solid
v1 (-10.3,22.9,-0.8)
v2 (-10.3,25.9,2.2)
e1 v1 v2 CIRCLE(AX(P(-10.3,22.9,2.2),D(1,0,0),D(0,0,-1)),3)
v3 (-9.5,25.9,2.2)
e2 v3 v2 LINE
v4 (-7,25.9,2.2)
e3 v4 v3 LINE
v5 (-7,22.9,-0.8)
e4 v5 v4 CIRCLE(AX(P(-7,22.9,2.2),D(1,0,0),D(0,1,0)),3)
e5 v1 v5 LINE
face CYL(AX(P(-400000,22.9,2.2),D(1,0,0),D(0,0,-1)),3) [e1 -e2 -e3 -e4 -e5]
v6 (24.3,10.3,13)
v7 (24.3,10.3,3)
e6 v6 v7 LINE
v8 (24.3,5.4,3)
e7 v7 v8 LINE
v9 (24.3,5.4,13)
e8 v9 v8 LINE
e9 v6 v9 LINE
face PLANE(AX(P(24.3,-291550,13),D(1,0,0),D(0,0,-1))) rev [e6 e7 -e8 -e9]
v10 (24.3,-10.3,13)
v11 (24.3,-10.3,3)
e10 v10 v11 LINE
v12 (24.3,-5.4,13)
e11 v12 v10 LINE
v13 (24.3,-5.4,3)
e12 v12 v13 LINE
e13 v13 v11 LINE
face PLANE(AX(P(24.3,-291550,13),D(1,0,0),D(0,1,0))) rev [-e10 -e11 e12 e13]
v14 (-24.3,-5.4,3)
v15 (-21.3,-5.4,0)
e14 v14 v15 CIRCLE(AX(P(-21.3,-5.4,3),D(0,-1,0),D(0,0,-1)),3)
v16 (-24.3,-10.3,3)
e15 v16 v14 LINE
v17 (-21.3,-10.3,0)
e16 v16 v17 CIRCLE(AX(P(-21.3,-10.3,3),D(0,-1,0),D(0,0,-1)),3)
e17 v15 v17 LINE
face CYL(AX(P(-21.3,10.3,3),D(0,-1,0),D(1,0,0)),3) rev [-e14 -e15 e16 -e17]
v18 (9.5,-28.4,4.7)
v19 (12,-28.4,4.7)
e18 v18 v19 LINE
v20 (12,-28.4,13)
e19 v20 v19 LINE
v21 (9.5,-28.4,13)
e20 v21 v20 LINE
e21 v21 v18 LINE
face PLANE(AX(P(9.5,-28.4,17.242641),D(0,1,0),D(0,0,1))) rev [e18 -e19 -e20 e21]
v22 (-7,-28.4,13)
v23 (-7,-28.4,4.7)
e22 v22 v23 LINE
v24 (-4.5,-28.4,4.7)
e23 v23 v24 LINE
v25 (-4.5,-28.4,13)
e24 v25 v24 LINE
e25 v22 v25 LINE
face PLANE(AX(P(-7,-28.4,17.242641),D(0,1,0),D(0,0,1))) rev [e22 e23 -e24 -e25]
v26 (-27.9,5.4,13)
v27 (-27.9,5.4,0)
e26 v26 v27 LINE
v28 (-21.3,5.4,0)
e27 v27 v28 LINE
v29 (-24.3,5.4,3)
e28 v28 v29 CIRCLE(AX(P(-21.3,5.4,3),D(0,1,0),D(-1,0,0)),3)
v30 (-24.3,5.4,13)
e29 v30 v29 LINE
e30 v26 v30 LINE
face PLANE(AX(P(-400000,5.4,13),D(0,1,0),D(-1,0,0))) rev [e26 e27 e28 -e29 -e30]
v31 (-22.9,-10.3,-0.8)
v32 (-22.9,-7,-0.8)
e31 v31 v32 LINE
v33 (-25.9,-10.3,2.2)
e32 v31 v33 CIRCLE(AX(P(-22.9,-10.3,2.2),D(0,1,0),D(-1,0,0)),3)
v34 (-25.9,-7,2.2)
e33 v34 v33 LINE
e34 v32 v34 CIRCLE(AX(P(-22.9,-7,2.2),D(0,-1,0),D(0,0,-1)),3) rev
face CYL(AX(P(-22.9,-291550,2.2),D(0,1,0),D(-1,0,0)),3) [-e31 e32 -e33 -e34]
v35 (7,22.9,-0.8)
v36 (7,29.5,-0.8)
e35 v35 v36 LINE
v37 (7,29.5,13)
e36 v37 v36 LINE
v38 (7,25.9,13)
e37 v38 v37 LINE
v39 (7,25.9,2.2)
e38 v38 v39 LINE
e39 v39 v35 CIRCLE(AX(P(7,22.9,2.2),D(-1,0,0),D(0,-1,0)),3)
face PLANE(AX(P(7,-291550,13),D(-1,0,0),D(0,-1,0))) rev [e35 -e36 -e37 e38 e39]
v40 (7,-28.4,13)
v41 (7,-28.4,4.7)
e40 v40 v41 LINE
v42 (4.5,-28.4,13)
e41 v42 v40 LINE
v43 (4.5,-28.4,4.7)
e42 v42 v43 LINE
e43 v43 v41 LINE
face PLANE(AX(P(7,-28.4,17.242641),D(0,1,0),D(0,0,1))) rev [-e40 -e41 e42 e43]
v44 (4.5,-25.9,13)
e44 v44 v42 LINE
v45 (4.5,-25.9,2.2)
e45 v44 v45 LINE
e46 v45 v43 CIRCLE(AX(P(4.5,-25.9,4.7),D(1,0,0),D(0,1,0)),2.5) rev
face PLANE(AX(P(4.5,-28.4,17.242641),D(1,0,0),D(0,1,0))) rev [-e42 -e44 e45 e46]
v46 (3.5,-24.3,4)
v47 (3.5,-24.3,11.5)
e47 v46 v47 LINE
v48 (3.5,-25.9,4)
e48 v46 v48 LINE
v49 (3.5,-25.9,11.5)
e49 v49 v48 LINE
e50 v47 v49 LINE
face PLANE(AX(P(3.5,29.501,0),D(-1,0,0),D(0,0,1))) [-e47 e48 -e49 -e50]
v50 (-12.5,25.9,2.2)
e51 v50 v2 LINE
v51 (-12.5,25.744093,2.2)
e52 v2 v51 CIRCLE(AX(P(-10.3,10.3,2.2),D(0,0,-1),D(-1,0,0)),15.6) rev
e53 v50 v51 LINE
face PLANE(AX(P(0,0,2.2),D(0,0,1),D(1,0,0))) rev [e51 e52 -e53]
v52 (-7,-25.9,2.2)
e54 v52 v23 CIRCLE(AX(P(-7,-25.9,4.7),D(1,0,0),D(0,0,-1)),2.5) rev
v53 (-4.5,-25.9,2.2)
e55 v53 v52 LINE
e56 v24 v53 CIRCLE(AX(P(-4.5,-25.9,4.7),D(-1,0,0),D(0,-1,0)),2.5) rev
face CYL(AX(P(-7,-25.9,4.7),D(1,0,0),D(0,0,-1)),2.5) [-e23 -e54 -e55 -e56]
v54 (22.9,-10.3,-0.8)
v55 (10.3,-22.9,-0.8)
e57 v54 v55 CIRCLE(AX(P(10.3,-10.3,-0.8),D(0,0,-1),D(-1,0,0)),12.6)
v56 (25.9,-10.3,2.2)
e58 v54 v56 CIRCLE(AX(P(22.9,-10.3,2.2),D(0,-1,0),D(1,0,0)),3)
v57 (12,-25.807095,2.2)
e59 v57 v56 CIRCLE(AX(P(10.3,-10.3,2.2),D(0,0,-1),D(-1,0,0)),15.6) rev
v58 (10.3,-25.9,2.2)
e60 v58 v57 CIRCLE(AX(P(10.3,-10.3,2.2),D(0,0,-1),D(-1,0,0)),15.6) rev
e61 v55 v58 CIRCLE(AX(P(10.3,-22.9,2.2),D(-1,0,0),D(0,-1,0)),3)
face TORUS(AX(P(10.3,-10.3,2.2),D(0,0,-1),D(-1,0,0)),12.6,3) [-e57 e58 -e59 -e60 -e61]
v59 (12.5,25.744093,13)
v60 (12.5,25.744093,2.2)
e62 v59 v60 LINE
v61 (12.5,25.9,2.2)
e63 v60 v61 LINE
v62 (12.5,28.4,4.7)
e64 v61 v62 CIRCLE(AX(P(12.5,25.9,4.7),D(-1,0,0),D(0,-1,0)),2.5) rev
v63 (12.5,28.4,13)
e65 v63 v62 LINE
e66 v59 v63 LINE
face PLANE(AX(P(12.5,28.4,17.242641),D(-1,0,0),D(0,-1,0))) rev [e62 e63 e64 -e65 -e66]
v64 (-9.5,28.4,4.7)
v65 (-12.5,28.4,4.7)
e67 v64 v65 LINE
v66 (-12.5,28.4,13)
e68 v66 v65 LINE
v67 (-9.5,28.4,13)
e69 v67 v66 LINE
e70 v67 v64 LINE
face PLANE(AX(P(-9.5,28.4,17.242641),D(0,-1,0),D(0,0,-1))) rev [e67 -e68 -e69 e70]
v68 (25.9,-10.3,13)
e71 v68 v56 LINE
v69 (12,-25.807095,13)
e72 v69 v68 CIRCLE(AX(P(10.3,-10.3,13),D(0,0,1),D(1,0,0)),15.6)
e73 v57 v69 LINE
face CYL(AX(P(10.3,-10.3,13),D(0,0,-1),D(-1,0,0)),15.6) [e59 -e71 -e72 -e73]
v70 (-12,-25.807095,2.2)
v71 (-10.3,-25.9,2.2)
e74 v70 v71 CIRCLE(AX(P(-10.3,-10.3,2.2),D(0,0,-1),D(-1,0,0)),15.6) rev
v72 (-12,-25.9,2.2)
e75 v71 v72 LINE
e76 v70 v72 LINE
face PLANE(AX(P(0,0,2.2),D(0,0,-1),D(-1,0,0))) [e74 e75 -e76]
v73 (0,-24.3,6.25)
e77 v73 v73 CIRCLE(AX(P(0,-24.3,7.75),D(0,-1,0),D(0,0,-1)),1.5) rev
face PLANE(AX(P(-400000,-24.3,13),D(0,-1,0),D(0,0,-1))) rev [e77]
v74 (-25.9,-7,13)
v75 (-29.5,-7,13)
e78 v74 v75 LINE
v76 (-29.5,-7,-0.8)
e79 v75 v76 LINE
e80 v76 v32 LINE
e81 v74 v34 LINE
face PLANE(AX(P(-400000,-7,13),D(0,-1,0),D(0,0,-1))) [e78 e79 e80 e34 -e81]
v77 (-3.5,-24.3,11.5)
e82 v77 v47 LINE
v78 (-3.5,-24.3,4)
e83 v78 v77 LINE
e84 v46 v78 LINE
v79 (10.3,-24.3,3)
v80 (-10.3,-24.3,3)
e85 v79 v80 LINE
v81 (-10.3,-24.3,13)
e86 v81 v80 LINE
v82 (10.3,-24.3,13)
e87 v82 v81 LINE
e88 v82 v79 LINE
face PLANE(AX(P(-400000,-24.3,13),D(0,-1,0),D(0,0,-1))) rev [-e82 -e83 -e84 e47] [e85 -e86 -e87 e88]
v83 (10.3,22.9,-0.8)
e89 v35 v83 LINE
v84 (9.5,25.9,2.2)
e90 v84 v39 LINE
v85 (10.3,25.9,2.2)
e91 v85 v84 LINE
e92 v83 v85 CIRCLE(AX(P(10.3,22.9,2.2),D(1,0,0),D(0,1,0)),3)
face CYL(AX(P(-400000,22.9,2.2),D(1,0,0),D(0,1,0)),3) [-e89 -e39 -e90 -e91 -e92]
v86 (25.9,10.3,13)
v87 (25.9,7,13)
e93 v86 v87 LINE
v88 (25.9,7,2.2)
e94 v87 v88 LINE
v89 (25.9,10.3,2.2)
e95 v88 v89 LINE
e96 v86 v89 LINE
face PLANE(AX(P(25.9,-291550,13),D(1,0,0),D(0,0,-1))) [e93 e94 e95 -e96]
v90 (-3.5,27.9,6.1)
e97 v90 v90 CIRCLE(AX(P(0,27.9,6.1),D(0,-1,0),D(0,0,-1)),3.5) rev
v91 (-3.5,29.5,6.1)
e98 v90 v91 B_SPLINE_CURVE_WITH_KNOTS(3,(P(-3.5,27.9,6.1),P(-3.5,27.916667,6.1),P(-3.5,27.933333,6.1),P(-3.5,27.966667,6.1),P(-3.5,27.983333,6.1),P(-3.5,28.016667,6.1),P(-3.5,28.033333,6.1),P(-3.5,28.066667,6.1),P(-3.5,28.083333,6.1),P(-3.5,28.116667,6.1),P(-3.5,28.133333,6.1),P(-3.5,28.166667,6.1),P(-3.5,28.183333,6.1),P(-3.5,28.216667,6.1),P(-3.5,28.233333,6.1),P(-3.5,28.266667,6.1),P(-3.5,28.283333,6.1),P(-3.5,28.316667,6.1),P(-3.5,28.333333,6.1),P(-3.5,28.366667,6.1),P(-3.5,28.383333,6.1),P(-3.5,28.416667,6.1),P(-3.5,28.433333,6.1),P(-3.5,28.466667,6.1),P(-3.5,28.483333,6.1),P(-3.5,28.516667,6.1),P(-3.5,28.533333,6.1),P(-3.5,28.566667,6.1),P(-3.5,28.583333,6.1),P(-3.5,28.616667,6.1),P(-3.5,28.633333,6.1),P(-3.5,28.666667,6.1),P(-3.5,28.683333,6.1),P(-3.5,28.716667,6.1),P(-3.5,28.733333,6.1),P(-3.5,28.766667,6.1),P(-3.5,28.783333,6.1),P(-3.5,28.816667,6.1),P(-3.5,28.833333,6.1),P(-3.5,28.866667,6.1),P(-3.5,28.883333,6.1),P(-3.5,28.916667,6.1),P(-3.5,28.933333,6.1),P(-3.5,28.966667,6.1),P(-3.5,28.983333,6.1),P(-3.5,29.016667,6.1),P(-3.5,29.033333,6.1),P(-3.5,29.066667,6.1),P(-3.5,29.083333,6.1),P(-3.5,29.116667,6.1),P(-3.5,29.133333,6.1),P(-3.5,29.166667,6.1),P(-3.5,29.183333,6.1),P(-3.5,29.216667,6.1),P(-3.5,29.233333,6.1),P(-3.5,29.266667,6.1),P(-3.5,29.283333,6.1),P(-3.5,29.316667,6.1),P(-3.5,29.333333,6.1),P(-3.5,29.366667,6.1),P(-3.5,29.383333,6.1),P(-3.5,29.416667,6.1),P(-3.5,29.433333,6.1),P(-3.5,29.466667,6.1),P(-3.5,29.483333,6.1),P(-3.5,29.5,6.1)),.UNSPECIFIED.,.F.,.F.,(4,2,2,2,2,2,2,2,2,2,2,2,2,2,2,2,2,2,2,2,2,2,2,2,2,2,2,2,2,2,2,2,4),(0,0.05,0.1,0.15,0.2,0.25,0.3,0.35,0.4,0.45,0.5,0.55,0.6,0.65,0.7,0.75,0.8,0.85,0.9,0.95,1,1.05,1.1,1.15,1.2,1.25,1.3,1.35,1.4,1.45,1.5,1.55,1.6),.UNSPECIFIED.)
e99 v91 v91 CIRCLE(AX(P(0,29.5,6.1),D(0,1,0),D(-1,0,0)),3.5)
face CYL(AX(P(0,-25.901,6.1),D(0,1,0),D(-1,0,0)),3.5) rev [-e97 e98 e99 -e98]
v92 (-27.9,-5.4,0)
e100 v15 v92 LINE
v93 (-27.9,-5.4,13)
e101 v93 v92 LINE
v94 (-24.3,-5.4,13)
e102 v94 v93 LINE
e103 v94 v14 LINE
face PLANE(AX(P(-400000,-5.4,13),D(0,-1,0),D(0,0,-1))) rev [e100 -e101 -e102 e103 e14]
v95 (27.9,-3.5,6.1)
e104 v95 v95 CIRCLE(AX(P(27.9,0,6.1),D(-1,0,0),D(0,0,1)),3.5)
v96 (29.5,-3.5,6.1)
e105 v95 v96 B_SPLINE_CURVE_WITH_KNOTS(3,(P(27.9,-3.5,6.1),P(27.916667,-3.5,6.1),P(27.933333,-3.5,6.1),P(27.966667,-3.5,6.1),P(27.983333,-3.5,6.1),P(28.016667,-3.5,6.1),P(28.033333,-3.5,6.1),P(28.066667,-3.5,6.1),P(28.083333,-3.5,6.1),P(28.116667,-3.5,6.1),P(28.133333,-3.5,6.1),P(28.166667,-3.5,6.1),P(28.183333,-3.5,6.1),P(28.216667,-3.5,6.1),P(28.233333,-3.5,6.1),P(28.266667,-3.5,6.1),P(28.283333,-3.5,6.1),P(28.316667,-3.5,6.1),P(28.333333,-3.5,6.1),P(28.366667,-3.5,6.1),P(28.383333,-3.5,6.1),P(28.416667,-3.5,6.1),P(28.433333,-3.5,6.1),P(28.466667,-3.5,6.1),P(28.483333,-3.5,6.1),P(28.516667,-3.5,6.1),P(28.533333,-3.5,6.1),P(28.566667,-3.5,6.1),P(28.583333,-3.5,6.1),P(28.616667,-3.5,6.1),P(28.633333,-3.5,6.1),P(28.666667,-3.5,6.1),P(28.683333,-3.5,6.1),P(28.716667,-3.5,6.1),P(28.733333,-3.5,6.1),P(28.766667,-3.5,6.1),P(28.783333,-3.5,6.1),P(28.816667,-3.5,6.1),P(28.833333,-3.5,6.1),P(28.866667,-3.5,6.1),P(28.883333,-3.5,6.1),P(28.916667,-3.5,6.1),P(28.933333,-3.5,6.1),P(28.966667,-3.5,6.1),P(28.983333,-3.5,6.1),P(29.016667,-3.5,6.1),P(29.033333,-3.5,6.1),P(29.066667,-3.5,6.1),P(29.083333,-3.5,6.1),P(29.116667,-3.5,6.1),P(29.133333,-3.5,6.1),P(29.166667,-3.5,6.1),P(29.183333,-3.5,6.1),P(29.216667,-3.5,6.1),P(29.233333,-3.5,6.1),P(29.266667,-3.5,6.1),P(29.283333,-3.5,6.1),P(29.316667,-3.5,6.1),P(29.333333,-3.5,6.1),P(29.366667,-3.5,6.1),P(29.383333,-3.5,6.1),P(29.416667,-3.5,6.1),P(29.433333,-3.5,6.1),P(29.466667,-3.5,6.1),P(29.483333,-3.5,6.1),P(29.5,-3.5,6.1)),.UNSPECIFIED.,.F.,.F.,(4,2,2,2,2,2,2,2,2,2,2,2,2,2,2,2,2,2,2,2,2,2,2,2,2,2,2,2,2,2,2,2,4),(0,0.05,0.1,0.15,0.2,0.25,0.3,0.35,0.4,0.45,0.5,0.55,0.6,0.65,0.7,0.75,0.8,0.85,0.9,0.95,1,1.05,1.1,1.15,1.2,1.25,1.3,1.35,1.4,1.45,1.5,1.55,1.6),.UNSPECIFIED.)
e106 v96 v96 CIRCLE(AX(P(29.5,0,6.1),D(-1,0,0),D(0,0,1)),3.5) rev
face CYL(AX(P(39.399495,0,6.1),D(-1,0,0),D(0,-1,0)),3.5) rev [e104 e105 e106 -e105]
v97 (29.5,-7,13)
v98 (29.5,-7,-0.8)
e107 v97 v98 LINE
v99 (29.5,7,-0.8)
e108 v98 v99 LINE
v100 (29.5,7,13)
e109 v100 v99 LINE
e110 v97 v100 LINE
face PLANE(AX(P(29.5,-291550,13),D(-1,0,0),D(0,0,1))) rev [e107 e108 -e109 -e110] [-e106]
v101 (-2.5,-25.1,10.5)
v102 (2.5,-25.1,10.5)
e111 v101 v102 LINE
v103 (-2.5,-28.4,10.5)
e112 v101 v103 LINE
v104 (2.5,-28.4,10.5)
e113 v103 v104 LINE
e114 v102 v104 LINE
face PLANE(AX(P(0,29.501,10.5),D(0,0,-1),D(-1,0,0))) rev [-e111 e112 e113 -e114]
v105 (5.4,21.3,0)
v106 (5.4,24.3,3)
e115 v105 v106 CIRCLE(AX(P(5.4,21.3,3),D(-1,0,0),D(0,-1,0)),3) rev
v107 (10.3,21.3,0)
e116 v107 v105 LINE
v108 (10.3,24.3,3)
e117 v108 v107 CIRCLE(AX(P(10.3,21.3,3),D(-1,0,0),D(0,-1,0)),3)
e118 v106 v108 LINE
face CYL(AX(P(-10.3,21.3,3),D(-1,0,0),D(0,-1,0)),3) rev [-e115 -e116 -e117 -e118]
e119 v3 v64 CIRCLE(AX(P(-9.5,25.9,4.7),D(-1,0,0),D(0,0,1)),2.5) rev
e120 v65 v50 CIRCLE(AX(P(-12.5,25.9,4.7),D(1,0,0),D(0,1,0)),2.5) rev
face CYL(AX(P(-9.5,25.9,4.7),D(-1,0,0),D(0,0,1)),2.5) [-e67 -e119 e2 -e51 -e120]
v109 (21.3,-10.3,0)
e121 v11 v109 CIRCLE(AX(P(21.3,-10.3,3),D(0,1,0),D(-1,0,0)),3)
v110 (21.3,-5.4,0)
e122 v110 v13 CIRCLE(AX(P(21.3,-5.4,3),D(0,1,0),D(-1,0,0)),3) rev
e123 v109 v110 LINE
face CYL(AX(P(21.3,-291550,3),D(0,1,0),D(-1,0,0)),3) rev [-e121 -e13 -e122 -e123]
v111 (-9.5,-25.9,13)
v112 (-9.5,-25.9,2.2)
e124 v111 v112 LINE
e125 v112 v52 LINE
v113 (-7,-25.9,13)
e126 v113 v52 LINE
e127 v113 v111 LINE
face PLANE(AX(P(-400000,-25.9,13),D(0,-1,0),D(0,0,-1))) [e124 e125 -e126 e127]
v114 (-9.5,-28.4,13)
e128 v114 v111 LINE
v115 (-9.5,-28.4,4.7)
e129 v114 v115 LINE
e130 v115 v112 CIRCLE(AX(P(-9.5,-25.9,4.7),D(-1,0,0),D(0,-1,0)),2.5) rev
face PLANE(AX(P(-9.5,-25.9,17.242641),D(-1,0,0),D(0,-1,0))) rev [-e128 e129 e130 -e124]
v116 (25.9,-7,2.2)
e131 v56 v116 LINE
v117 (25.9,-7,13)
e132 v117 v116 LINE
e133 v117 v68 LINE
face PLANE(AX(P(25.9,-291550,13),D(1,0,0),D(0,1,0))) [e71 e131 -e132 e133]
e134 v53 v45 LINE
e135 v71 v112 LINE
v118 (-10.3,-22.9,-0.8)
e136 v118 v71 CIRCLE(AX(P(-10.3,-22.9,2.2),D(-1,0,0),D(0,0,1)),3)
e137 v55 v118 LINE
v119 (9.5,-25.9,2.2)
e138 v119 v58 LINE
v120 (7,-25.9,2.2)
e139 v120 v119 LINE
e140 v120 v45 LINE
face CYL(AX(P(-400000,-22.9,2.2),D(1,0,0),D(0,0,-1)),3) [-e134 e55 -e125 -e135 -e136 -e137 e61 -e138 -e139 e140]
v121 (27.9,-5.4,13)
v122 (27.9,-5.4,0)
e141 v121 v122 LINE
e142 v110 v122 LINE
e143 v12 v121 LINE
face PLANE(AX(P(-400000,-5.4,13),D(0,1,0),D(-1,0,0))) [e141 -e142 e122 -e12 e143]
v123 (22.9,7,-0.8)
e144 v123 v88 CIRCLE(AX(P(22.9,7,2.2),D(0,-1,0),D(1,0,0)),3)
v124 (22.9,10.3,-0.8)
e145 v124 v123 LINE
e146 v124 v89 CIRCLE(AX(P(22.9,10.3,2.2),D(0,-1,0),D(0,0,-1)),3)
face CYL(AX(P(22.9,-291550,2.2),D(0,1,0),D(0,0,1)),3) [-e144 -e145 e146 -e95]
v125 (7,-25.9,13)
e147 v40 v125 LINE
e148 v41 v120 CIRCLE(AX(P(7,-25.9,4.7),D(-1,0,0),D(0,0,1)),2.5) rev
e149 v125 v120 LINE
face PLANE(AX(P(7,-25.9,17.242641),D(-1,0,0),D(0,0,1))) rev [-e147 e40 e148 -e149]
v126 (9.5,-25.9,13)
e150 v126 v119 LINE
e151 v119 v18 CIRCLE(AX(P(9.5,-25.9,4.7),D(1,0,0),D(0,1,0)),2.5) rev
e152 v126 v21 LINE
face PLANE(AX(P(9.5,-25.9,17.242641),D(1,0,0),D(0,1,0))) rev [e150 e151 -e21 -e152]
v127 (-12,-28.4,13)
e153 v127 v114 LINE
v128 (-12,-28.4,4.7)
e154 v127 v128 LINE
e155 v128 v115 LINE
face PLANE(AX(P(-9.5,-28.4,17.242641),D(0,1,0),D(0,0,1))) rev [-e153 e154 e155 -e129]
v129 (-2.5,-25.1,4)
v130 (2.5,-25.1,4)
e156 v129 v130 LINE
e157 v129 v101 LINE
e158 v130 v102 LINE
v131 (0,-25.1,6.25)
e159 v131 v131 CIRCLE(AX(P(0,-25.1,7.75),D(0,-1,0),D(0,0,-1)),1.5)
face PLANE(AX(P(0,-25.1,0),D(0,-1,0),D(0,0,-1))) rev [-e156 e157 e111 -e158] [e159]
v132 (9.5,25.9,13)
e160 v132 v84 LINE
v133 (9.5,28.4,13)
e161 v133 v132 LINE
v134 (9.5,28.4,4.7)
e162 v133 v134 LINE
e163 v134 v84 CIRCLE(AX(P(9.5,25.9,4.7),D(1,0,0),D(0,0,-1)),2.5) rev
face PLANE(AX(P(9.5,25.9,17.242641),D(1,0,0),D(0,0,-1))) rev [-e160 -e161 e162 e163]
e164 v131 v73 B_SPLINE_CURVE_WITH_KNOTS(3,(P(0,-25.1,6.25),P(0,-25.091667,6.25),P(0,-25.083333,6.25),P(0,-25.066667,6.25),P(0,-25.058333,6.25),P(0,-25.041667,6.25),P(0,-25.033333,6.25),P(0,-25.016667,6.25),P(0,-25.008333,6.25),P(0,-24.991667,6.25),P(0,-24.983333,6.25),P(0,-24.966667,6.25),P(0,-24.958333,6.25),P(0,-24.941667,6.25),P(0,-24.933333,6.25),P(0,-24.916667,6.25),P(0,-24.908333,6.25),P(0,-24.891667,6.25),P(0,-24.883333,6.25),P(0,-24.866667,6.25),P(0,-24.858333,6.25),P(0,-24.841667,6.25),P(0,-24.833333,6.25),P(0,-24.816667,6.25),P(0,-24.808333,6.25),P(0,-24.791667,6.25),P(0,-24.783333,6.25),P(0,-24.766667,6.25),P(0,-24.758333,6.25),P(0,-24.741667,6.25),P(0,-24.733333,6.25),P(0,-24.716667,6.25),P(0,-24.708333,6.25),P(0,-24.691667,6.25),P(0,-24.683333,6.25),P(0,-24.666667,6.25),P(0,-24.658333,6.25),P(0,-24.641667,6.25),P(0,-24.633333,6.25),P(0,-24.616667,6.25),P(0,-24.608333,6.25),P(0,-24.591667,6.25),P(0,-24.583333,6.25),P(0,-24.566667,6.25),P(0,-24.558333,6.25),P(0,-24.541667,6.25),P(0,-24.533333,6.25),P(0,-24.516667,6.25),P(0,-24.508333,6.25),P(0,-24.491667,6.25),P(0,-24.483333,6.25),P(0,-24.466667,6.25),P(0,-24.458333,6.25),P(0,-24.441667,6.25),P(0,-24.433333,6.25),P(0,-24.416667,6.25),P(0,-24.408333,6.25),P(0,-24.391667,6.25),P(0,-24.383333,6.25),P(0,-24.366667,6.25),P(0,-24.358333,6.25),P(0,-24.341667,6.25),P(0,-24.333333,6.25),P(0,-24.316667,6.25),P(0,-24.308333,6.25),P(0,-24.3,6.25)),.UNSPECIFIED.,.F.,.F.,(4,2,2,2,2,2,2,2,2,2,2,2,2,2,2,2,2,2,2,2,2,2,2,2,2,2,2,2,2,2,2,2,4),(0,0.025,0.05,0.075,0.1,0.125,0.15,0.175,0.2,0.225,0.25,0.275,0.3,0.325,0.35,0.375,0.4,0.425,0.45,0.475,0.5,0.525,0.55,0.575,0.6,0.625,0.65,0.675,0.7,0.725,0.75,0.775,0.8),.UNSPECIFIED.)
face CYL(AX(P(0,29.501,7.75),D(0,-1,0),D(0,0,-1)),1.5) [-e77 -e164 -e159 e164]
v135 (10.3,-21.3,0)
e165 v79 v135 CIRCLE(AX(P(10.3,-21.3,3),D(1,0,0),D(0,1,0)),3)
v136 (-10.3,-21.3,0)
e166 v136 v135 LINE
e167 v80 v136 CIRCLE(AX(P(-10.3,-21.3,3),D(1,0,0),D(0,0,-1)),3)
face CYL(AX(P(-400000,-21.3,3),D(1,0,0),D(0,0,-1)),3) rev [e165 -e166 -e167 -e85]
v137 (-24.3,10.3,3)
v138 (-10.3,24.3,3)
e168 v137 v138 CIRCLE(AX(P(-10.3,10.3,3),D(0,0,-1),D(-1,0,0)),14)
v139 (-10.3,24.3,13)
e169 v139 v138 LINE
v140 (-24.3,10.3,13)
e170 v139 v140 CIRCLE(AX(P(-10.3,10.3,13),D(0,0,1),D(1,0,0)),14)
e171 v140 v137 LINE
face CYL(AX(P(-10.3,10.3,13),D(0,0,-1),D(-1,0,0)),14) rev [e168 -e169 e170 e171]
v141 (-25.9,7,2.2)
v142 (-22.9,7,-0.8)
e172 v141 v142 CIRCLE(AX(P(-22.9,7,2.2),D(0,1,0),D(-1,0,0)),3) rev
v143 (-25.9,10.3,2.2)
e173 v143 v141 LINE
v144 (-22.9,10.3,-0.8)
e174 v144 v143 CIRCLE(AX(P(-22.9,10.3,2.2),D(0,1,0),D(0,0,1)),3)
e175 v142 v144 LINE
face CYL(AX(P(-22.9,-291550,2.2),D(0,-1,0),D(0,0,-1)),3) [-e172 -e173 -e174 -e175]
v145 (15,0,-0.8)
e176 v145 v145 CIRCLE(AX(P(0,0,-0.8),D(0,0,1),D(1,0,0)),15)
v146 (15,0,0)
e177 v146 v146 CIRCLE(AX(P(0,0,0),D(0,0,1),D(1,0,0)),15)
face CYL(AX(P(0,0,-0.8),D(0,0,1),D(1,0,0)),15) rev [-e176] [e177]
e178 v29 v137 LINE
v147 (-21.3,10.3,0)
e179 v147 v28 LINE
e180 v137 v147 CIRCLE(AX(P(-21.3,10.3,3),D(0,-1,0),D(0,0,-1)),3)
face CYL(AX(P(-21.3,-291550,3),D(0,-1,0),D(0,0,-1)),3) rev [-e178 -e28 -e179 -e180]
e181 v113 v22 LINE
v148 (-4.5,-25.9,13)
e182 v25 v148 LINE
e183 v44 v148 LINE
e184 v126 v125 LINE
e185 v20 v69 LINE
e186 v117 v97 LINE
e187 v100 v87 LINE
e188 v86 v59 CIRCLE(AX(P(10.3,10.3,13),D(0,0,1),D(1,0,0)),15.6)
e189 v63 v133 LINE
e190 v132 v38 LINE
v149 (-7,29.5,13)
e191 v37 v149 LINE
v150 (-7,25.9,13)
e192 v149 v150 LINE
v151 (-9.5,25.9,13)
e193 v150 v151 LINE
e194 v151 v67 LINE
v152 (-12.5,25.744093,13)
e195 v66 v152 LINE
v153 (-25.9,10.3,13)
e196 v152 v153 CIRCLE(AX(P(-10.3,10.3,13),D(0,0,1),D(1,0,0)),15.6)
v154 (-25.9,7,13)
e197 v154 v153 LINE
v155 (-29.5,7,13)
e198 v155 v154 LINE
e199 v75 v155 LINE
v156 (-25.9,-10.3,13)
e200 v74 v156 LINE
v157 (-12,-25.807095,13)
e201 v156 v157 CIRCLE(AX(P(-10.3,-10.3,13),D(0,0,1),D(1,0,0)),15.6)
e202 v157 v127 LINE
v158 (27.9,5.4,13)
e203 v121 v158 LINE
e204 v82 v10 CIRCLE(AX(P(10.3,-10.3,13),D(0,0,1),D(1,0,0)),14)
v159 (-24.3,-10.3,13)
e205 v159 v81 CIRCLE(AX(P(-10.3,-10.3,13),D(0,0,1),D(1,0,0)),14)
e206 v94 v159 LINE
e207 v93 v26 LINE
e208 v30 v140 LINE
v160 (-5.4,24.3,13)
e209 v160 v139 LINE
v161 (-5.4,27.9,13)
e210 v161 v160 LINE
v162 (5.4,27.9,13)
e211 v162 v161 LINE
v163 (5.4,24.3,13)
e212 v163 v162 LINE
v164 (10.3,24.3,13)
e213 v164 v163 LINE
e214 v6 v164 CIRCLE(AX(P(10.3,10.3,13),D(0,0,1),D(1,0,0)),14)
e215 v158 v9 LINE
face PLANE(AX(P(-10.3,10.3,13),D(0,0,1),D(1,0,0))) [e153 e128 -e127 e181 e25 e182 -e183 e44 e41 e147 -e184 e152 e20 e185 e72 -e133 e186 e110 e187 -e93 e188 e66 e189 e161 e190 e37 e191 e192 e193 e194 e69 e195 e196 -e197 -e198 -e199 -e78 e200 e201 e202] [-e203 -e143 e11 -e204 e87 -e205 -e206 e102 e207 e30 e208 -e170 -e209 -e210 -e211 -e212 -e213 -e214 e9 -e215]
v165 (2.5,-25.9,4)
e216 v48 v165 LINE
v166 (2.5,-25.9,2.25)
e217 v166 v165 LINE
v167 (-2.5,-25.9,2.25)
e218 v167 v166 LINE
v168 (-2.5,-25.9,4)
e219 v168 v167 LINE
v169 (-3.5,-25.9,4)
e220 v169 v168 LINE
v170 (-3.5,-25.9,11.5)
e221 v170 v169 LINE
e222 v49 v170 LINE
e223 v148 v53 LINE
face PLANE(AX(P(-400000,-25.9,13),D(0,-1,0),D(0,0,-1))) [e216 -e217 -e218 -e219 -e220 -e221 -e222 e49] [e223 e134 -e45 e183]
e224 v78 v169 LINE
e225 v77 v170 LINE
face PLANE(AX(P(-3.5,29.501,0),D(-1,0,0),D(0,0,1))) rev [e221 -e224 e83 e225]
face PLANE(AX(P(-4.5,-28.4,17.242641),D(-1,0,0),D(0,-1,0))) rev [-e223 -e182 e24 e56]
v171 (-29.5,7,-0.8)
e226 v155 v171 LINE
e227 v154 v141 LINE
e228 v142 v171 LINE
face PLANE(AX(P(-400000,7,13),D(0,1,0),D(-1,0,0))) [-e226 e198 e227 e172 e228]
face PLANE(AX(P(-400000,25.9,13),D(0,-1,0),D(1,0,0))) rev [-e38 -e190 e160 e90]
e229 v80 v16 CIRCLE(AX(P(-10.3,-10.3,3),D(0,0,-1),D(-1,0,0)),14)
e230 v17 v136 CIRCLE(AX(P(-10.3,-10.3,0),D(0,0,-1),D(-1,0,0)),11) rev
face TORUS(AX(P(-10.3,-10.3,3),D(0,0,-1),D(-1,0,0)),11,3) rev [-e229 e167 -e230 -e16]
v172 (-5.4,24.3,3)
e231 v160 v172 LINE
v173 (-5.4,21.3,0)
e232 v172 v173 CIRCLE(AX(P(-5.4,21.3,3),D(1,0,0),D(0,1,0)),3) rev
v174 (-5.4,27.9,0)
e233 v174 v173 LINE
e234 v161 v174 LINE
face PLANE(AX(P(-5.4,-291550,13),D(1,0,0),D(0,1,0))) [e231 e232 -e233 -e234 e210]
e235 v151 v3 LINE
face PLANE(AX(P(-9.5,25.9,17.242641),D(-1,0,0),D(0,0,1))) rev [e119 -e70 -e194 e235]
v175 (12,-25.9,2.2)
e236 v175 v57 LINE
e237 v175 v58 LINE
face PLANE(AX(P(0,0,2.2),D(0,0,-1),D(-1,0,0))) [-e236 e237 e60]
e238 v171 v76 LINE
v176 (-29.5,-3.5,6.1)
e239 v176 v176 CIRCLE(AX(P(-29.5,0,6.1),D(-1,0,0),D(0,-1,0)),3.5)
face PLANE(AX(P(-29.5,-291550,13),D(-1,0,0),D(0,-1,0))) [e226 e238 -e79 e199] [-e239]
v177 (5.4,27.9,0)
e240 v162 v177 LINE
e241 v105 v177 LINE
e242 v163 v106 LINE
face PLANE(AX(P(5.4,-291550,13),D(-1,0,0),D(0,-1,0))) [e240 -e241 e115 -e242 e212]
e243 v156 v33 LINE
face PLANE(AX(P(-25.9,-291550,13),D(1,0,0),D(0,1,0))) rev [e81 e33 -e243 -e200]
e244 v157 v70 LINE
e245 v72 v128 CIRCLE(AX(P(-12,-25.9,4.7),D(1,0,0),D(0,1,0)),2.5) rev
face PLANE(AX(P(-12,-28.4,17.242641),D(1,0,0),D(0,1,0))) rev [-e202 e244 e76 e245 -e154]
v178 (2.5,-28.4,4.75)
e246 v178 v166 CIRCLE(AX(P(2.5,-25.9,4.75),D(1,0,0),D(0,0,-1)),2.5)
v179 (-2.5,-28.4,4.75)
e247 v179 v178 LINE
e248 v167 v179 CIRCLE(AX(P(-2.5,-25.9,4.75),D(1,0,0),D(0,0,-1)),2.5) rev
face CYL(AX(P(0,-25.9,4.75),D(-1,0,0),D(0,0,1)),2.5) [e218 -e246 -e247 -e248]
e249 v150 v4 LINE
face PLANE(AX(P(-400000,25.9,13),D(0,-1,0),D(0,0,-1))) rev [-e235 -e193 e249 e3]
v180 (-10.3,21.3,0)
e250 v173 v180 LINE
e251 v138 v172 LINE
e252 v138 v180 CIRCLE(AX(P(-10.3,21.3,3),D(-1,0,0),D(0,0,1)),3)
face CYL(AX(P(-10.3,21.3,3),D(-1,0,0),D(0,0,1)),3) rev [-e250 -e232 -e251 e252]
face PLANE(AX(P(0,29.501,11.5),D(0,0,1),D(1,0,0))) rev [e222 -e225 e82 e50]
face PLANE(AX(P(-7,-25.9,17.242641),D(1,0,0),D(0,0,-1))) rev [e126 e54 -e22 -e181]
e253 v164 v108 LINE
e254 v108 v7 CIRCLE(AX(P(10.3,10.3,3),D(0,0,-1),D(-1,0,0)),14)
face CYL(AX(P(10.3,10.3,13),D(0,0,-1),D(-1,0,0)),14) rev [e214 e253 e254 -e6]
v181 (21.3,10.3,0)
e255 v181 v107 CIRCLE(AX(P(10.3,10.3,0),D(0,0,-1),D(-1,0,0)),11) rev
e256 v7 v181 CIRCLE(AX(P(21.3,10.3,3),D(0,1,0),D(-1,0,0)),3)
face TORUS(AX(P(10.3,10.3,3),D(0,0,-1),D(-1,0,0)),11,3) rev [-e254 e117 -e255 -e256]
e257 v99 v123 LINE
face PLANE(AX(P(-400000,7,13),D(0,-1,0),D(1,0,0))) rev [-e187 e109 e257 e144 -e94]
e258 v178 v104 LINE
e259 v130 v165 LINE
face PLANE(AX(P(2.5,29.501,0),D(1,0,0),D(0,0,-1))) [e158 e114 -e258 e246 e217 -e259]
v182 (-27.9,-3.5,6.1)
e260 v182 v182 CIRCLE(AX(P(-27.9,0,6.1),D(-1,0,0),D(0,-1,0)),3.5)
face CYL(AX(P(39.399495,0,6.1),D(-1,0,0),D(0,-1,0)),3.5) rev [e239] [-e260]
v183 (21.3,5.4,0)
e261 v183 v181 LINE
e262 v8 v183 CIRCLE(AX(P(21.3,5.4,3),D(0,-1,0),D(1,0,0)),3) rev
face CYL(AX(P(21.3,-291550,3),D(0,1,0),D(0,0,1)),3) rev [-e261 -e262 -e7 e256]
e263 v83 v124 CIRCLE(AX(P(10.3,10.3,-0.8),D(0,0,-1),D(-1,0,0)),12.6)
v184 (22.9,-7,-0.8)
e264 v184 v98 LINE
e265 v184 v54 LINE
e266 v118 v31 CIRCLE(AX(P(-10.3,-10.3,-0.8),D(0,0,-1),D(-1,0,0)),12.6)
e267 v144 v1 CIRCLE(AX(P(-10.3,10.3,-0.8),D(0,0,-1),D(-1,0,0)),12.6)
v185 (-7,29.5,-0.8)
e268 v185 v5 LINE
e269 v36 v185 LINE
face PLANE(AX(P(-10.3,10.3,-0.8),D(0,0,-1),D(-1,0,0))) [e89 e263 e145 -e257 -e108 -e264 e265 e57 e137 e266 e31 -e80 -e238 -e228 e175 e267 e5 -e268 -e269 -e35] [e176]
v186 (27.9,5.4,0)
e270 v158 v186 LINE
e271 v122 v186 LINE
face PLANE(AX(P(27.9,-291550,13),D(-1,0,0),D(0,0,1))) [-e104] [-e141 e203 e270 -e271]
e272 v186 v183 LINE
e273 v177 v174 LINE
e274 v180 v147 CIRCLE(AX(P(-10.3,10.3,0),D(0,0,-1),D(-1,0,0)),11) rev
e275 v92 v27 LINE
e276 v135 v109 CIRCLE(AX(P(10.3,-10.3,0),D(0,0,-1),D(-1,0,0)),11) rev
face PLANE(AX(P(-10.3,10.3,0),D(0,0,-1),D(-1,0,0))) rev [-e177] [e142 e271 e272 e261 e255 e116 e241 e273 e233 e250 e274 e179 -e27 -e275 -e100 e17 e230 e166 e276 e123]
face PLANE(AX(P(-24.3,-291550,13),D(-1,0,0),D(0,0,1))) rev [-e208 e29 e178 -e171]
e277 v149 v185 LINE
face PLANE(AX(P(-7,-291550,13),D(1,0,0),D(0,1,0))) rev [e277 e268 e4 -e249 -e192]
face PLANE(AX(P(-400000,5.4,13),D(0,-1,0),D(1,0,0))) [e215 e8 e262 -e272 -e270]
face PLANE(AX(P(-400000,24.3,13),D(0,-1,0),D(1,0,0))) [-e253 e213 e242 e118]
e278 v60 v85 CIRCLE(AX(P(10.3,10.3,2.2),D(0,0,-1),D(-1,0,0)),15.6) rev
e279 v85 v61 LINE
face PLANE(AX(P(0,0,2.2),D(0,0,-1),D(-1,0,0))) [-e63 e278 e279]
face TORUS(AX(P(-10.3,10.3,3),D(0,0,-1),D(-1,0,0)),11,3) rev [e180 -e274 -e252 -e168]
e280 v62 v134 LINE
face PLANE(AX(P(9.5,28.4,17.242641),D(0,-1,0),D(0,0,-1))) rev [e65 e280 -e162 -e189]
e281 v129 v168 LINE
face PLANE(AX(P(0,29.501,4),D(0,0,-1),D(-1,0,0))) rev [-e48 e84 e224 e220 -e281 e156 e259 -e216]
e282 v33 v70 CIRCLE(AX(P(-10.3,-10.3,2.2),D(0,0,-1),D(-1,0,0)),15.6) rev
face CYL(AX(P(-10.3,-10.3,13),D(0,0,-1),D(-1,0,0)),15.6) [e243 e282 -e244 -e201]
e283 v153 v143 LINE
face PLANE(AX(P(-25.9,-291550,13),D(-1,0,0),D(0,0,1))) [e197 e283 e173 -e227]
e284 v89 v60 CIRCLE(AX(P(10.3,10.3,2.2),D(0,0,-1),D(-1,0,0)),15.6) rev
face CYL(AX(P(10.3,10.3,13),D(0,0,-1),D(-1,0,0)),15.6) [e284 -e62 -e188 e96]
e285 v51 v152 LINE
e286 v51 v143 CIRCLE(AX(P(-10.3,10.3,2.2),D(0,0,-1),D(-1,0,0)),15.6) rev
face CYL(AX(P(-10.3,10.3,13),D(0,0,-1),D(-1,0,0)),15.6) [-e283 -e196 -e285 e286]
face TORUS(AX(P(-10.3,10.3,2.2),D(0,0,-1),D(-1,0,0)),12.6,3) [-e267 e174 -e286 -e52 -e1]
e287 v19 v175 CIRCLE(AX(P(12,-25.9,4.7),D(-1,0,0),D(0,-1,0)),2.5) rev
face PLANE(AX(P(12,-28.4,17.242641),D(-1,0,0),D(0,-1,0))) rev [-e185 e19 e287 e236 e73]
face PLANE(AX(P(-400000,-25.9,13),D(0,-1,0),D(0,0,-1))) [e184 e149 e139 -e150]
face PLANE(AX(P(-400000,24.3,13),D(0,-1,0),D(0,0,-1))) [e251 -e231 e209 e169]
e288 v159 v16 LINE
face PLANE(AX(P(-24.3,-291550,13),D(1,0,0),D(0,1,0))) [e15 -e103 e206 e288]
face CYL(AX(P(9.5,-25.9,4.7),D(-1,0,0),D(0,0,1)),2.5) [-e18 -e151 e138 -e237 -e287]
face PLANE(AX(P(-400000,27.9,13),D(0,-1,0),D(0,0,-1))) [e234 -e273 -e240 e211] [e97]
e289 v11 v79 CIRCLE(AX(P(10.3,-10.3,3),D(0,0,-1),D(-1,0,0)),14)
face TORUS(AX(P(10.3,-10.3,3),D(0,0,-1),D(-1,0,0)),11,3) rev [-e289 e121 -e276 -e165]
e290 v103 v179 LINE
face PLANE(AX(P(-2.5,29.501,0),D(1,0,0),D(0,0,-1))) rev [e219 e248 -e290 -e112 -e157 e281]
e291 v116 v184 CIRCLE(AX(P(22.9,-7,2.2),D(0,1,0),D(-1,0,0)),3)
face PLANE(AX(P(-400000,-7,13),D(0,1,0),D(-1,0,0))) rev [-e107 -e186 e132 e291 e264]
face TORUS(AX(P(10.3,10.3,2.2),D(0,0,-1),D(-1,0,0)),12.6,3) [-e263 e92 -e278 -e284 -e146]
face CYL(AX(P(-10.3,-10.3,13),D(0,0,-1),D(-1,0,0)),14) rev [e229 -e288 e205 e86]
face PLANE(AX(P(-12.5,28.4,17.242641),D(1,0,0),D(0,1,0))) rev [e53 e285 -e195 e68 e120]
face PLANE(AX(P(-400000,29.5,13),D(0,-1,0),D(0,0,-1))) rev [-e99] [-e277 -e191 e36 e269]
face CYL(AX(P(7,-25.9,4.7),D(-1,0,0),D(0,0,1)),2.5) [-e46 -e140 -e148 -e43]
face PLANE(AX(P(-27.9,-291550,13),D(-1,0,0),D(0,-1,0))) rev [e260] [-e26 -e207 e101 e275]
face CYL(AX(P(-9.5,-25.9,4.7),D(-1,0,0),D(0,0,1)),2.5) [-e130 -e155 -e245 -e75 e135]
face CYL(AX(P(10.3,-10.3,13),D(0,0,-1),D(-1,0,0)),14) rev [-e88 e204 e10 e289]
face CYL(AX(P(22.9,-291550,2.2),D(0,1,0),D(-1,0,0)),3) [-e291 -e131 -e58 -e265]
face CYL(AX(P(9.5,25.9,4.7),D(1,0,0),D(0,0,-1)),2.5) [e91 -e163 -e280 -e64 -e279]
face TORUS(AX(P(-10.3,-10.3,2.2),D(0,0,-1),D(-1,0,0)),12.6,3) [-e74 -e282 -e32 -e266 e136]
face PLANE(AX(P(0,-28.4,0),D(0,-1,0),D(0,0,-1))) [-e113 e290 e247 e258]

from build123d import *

# Parameters (mm, degrees)
EXTRUDE_1487_DEPTH     = 13
EXTRUDE_START          = -0.8
SKETCH_8_R             = 15
EXTRUDE_1654_DEPTH     = 0.8
CUT_EXTRUDE_1920_REACH = 69.233
SKETCH_1784_R          = 3.5
CUT_EXTRUDE_2148_REACH = 66.097
SKETCH_2017_R          = 3.5
CUT_EXTRUDE_2773_REACH = 66.097
CUT_EXTRUDE_2851_REACH = 66.897
CUT_EXTRUDE_START      = -0.8
SKETCH_3_W             = 5
SKETCH_3_H             = 6.5
SKETCH_3_R             = 1.5
FILLET_3030_R          = 3
FILLET_3594_R          = 3
EXTRUDE_START_2        = 2.2
SKETCH_4254_W          = 2.5
SKETCH_4254_H          = 2.5
EXTRUDE_4621_DEPTH     = 10.8
EXTRUDE_START_3        = 2.5
SKETCH_5_W             = 5
SKETCH_5_H             = 1.75
SKETCH_5_H_2           = 6.5
SKETCH_5_R             = 1.5
EXTRUDE_4751_DEPTH     = 2.5
FILLET_1_R             = 2.5


with BuildPart() as part:
    # Sketch 348 → Extrude 1487 (new body)
    with BuildSketch(Plane.XY):
        with BuildLine():
            Line((-10.3, -25.9), (10.3, -25.9))
            ThreePointArc((10.3, -25.9), (21.330865787, -21.330865787), (25.9, -10.3))
            Line((25.9, -10.3), (25.9, -7))
            Line((25.9, -7), (29.5, -7))
            Line((29.5, -7), (29.5, 7))
            Line((29.5, 7), (25.9, 7))
            Line((25.9, 7), (25.9, 10.3))
            ThreePointArc((25.9, 10.3), (21.330865787, 21.330865787), (10.3, 25.9))
            Line((10.3, 25.9), (7, 25.9))
            Line((7, 25.9), (7, 29.5))
            Line((7, 29.5), (-7, 29.5))
            Line((-7, 29.5), (-7, 25.9))
            Line((-7, 25.9), (-10.3, 25.9))
            ThreePointArc((-10.3, 25.9), (-21.330865787, 21.330865787), (-25.9, 10.3))
            Line((-25.9, 10.3), (-25.9, 7))
            Line((-25.9, 7), (-29.5, 7))
            Line((-29.5, 7), (-29.5, -7))
            Line((-29.5, -7), (-25.9, -7))
            Line((-25.9, -7), (-25.9, -10.3))
            ThreePointArc((-25.9, -10.3), (-21.330865787, -21.330865787), (-10.3, -25.9))
        make_face()
        with BuildLine():
            Line((-10.3, -24.3), (10.3, -24.3))
            ThreePointArc((10.3, -24.3), (20.199494937, -20.199494937), (24.3, -10.3))
            Line((24.3, -10.3), (24.3, -5.4))
            Line((24.3, -5.4), (27.9, -5.4))
            Line((27.9, -5.4), (27.9, 5.4))
            Line((27.9, 5.4), (24.3, 5.4))
            Line((24.3, 5.4), (24.3, 10.3))
            ThreePointArc((24.3, 10.3), (20.199494937, 20.199494937), (10.3, 24.3))
            Line((10.3, 24.3), (5.4, 24.3))
            Line((5.4, 24.3), (5.4, 27.9))
            Line((5.4, 27.9), (-5.4, 27.9))
            Line((-5.4, 27.9), (-5.4, 24.3))
            Line((-5.4, 24.3), (-10.3, 24.3))
            ThreePointArc((-10.3, 24.3), (-20.199494937, 20.199494937), (-24.3, 10.3))
            Line((-24.3, 10.3), (-24.3, 5.4))
            Line((-24.3, 5.4), (-27.9, 5.4))
            Line((-27.9, 5.4), (-27.9, -5.4))
            Line((-27.9, -5.4), (-24.3, -5.4))
            Line((-24.3, -5.4), (-24.3, -10.3))
            ThreePointArc((-24.3, -10.3), (-20.199494937, -20.199494937), (-10.3, -24.3))
        make_face(mode=Mode.SUBTRACT)
    extrude(amount=EXTRUDE_1487_DEPTH)

    # Эскиз-База<8> → Extrude 1654 (add)
    with BuildSketch(Plane.XY.offset(EXTRUDE_START)):
        with BuildLine():
            Line((-25.9, 7), (-29.5, 7))
            Line((-29.5, 7), (-29.5, -7))
            Line((-29.5, -7), (-25.9, -7))
            Line((-25.9, -7), (-25.9, -10.3))
            ThreePointArc((-25.9, -10.3), (-21.330865787, -21.330865787), (-10.3, -25.9))
            Line((-10.3, -25.9), (10.3, -25.9))
            ThreePointArc((10.3, -25.9), (21.330865787, -21.330865787), (25.9, -10.3))
            Line((25.9, -10.3), (25.9, -7))
            Line((25.9, -7), (29.5, -7))
            Line((29.5, -7), (29.5, 7))
            Line((29.5, 7), (25.9, 7))
            Line((25.9, 7), (25.9, 10.3))
            ThreePointArc((25.9, 10.3), (21.330865787, 21.330865787), (10.3, 25.9))
            Line((10.3, 25.9), (7, 25.9))
            Line((7, 25.9), (7, 29.5))
            Line((7, 29.5), (-7, 29.5))
            Line((-7, 29.5), (-7, 25.9))
            Line((-7, 25.9), (-10.3, 25.9))
            ThreePointArc((-10.3, 25.9), (-21.330865787, 21.330865787), (-25.9, 10.3))
            Line((-25.9, 10.3), (-25.9, 7))
        make_face()
        Circle(SKETCH_8_R, mode=Mode.SUBTRACT)
    extrude(amount=EXTRUDE_1654_DEPTH)

    # Sketch 1784 → Cut-Extrude 1920 (cut, up to next)
    with BuildSketch(Plane.ZY.offset(29.5), mode=Mode.PRIVATE) as cut_extrude_1920_sk1:
        with Locations(Location((6.1, 0, 0), (0, 0, 270))):
            Circle(SKETCH_1784_R)
    cut_extrude_1920_tool1 = extrude(cut_extrude_1920_sk1.sketch, amount=-CUT_EXTRUDE_1920_REACH, mode=Mode.PRIVATE) & part.part
    add(cut_extrude_1920_tool1.solids().sort_by_distance((-29.5, 0, 6.1))[0], mode=Mode.SUBTRACT)
    add(cut_extrude_1920_tool1.solids().sort_by_distance((-29.5, 0, 6.1))[1], mode=Mode.SUBTRACT)

    # Sketch 2017 → Cut-Extrude 2148 (cut, up to next)
    with BuildSketch(Plane(origin=(0, 29.5, 0), x_dir=(1, 0, 0), z_dir=(0, 1, 0)), mode=Mode.PRIVATE) as cut_extrude_2148_sk1:
        with Locations(Location((0, -6.1, 0), (0, 0, 180))):
            Circle(SKETCH_2017_R)
    cut_extrude_2148_tool1 = extrude(cut_extrude_2148_sk1.sketch, amount=-CUT_EXTRUDE_2148_REACH, mode=Mode.PRIVATE) & part.part
    add(cut_extrude_2148_tool1.solids().sort_by_distance((0, 29.5, 6.1))[0], mode=Mode.SUBTRACT)

    # Sketch 2270 → Cut-Extrude 2773 (cut, up to next)
    with BuildSketch(Plane.XZ.offset(25.9), mode=Mode.PRIVATE) as cut_extrude_2773_sk1:
        Polygon((3.5, 11.5), (3.5, 4), (2.5, 4), (2.5, 10.5), (-2.5, 10.5), (-2.5, 4), (-3.5, 4), (-3.5, 11.5), align=None)
    cut_extrude_2773_tool1 = extrude(cut_extrude_2773_sk1.sketch, amount=-CUT_EXTRUDE_2773_REACH, mode=Mode.PRIVATE) & part.part
    add(cut_extrude_2773_tool1.solids().sort_by_distance((3.397409, -25.9, 7.75))[0], mode=Mode.SUBTRACT)

    # Эскиз-Кнопка записи<3> → Cut-Extrude 2851 (cut, up to next)
    with BuildSketch(Plane.XZ.offset(25.9).offset(CUT_EXTRUDE_START), mode=Mode.PRIVATE) as cut_extrude_2851_sk1:
        with Locations((0, 7.25)):
            Rectangle(SKETCH_3_W, SKETCH_3_H)
        with Locations(Location((0, 7.75, 0), (0, 0, 270))):
            Circle(SKETCH_3_R, mode=Mode.SUBTRACT)
    cut_extrude_2851_tool1 = extrude(cut_extrude_2851_sk1.sketch, amount=-CUT_EXTRUDE_2851_REACH, mode=Mode.PRIVATE) & part.part
    add(cut_extrude_2851_tool1.solids().sort_by_distance((-2.417994, -25.1, 7.25))[0], mode=Mode.SUBTRACT)

    # Fillet 3030
    fillet_3030_edges = [part.edges().sort_by_distance(p)[0] for p in [
        (-7.85, 24.3, 0),
        (-20.199494937, 20.199494937, 0),
        (-24.3, -7.85, 0),
        (-20.199494937, -20.199494937, 0),
        (20.199494937, -20.199494937, 0),
        (20.199494937, 20.199494937, 0),
        (7.85, 24.3, 0),
        (24.3, 7.85, 0),
        (24.3, -7.85, 0),
        (0, -24.3, 0),
        (-24.3, 7.85, 0),
    ]]
    fillet(fillet_3030_edges, radius=FILLET_3030_R)

    # Fillet 3594
    fillet_3594_edges = [part.edges().sort_by_distance(p)[0] for p in [
        (-21.330865787, 21.330865787, -0.8),
        (-8.65, 25.9, -0.8),
        (8.65, 25.9, -0.8),
        (21.330865787, 21.330865787, -0.8),
        (25.9, 8.65, -0.8),
        (25.9, -8.65, -0.8),
        (21.330865787, -21.330865787, -0.8),
        (0, -25.9, -0.8),
        (-21.330865787, -21.330865787, -0.8),
        (-25.9, -8.65, -0.8),
        (-25.9, 8.65, -0.8),
    ]]
    fillet(fillet_3594_edges, radius=FILLET_3594_R)

    # Sketch 4254 → Extrude 4621 (add)
    with BuildSketch(Plane.XY.offset(EXTRUDE_START_2)):
        Polygon((-9.5, 25.9), (-9.5, 28.4), (-12.5, 28.4), (-12.5, 25.4), align=None)
        Polygon((12, -25.4), (9.5, -25.9), (9.5, -28.4), (12, -28.4), align=None)
        Polygon((9.5, 25.9), (9.5, 28.4), (12.5, 28.4), (12.5, 25.4), align=None)
        Polygon((-9.5, -25.9), (-9.5, -28.4), (-12, -28.4), (-12, -25.4), align=None)
        with Locations((-5.75, -27.15)):
            Rectangle(SKETCH_4254_W, SKETCH_4254_H)
        with Locations((5.75, -27.15)):
            Rectangle(SKETCH_4254_W, SKETCH_4254_H)
    extrude(amount=EXTRUDE_4621_DEPTH)

    # Эскиз-Кнопка записи<5> → Extrude 4751 (add)
    # profile 1 of 3: a face of its own
    with BuildSketch(Plane.XZ.offset(25.9).offset(EXTRUDE_START_3)):
        with Locations((0, 3.125)):
            Rectangle(SKETCH_5_W, SKETCH_5_H)
    # profile 2 of 3: a face of its own
    with BuildSketch(Plane.XZ.offset(25.9).offset(EXTRUDE_START_3)):
        with Locations((0, 7.25)):
            Rectangle(SKETCH_5_W, SKETCH_5_H_2)
        with Locations(Location((0, 7.75, 0), (0, 0, 270))):
            Circle(SKETCH_5_R, mode=Mode.SUBTRACT)
    # profile 3 of 3: a face of its own
    with BuildSketch(Plane.XZ.offset(25.9).offset(EXTRUDE_START_3)):
        with Locations(Location((0, 7.75, 0), (0, 0, 270))):
            Circle(SKETCH_5_R)
    extrude(amount=-EXTRUDE_4751_DEPTH)

    # Скругление1
    fillet_1_edges = [part.edges().sort_by_distance(p)[0] for p in [
        (10.75, -28.4, 2.2),
        (5.75, -28.4, 2.2),
        (-10.75, -28.4, 2.2),
        (-5.75, -28.4, 2.2),
        (0, -28.4, 2.25),
        (11, 28.4, 2.2),
        (-11, 28.4, 2.2),
    ]]
    fillet(fillet_1_edges, radius=FILLET_1_R - 0.0001)  # a hair under: the kernel refuses the full size


solid = part.part
